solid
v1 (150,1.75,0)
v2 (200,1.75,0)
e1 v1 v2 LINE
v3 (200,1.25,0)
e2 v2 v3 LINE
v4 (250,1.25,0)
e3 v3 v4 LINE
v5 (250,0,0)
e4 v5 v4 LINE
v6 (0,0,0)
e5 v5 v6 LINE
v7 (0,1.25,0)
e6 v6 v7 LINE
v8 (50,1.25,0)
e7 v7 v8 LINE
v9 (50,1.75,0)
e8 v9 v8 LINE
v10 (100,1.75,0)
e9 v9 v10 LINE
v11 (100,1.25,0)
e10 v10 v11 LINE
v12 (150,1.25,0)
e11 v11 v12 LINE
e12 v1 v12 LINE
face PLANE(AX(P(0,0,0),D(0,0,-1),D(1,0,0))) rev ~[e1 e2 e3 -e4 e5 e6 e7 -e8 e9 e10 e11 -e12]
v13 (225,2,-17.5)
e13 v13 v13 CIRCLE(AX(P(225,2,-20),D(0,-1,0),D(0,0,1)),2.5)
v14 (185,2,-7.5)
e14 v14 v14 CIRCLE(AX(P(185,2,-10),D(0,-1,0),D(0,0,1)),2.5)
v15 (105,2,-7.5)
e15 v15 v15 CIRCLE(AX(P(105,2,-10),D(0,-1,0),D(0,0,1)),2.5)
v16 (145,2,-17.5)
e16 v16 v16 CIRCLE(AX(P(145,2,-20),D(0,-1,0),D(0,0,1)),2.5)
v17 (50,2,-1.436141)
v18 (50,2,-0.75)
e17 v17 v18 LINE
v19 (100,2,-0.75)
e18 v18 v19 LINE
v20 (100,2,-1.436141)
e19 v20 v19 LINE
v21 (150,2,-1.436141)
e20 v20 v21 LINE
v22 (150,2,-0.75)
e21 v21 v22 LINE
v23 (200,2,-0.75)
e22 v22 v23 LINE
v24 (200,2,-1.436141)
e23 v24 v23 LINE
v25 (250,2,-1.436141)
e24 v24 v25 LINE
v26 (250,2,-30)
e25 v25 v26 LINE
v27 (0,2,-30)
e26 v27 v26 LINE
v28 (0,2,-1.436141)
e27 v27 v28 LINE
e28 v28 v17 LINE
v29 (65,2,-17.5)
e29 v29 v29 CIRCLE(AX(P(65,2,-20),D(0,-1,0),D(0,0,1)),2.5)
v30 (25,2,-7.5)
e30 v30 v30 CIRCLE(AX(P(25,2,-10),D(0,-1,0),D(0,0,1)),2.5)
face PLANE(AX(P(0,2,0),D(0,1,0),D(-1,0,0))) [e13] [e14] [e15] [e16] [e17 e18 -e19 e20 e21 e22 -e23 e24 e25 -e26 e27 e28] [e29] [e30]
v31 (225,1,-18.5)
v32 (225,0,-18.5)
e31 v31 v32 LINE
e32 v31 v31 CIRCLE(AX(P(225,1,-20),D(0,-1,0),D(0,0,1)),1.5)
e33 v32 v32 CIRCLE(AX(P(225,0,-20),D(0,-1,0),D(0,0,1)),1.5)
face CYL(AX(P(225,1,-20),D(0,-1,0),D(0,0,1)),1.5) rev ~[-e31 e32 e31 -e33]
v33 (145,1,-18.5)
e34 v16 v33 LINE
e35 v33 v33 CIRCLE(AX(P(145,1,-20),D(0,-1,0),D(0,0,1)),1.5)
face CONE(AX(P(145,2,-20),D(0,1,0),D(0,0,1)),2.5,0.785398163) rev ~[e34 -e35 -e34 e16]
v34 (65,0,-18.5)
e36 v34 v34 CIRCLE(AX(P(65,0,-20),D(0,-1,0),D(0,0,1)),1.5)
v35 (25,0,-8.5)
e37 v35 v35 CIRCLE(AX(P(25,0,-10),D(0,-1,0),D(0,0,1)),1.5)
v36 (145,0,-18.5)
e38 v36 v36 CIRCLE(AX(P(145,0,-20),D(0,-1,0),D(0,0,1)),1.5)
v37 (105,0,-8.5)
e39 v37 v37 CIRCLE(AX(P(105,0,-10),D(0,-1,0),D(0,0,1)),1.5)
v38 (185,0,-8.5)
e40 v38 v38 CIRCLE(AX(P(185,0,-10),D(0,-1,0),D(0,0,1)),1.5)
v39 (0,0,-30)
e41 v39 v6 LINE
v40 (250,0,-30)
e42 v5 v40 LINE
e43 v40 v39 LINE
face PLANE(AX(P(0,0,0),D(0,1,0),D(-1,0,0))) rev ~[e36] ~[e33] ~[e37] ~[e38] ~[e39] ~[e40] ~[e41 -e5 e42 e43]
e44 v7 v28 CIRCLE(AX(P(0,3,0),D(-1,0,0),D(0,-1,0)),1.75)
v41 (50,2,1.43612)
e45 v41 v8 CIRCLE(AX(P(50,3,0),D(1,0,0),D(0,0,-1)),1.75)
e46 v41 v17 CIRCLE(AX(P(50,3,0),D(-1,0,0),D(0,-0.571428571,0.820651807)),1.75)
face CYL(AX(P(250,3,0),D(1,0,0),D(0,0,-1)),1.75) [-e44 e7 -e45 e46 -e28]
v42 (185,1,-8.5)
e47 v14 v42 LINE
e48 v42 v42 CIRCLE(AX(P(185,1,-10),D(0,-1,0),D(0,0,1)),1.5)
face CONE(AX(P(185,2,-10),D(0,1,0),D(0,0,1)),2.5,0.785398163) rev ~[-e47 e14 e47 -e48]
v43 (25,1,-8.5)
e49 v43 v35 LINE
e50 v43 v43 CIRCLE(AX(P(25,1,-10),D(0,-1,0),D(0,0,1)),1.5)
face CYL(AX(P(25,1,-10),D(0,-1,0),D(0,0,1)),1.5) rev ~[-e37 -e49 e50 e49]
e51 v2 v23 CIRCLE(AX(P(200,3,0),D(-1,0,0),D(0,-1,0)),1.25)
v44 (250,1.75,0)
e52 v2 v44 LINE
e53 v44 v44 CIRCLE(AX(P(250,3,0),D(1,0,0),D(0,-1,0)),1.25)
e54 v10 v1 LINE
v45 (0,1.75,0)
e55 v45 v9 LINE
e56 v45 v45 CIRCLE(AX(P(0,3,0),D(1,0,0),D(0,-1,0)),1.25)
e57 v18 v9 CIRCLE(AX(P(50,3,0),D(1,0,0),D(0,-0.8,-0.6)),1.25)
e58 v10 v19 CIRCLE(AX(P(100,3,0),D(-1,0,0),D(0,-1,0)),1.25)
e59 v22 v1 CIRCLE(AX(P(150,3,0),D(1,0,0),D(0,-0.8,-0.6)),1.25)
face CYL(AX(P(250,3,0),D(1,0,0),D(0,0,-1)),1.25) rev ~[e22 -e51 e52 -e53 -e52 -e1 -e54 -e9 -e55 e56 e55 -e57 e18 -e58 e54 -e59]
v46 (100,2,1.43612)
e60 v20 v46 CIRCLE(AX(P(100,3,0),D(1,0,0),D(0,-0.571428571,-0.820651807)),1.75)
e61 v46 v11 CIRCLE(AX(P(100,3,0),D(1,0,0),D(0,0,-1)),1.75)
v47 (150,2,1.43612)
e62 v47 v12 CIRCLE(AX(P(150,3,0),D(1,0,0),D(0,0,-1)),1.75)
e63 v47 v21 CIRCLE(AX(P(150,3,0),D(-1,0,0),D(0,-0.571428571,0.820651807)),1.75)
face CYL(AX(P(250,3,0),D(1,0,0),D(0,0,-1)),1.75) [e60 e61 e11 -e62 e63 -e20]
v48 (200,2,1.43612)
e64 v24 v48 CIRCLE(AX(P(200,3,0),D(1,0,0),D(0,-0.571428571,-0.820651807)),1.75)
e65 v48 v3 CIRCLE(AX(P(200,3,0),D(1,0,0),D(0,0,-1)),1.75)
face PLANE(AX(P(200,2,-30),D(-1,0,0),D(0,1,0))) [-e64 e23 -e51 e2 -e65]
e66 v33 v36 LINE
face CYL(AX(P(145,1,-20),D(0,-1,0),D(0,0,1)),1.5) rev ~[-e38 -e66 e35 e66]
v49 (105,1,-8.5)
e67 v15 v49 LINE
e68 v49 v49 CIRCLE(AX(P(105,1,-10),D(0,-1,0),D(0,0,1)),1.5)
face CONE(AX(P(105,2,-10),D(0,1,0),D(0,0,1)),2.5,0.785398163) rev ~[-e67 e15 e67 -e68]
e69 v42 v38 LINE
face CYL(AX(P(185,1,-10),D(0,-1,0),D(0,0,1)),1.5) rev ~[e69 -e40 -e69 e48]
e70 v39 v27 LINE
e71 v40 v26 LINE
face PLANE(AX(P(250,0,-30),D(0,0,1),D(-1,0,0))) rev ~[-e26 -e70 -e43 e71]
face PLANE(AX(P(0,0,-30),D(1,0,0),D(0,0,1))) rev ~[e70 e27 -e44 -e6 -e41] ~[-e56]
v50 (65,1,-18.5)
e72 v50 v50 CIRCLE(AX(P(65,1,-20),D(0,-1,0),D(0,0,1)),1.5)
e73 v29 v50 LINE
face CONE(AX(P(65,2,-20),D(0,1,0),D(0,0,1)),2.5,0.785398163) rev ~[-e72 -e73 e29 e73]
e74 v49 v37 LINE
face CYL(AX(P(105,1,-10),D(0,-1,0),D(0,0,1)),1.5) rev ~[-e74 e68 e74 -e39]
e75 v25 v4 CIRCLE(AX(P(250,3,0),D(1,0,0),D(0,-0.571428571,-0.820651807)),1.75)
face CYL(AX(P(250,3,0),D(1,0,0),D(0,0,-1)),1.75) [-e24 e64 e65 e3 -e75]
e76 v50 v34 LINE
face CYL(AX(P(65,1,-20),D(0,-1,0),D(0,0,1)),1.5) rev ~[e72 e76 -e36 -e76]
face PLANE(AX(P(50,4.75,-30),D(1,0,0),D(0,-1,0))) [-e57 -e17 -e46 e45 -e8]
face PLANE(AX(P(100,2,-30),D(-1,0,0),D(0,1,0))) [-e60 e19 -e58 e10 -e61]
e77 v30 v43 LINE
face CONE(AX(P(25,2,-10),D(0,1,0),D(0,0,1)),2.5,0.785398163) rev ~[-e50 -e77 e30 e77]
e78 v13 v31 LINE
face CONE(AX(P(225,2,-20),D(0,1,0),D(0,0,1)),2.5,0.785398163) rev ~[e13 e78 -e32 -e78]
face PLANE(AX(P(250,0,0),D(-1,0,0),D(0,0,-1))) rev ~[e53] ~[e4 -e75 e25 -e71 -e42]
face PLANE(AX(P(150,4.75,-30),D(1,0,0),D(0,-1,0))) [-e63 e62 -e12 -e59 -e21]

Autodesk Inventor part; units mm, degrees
ref_plane "YZ Plane" through (0, 0, 0) normal (1, 0, 0) x (0, 1, 0)
ref_plane "XZ Plane" through (0, 0, 0) normal (0, 1, 0) x (-1, 0, 0)
sketch "Sketch1" plane through (0, 0, 0) normal (0, 1, 0) x (-1, 0, 0)
  line L0 (0, 0) -> (-250, 0)
  line L1 (-250, 0) -> (-250, -30)
  line L2 (-250, -30) -> (0, -30)
  line L3 (0, -30) -> (0, 0)
  dimension "d0" = 250
  dimension "d1" = 30
extrude "Extrusion1" add sketch "Sketch1" along normal blind 2
sketch "Sketch2" plane through (250, 0, 0) normal (1, 0, 0) x (0, 0, -1)
  circle A0 centre (0, 3) radius 1.25
  circle A1 centre (0, 3) radius 1.75
  point P0 (0, 0)
  dimension "d4" = 2.5
  dimension "d5" = 3
  dimension "d6" = 3.5
extrude "Extrusion2" add sketch "Sketch2" against normal blind 250
extrude "Extrusion3" cut sketch "Sketch2" against normal blind 250 contours A0
sketch "Sketch3" plane through (250, 0, -30) normal (0, 0, -1) x (-1, 0, 0)
  line L0 (50, 4.75) -> (100, 4.75)
  line L1 (100, 4.75) -> (100, 2)
  line L2 (100, 2) -> (50, 2)
  line L3 (50, 2) -> (50, 4.75)
  line L4 (150, 4.75) -> (200, 4.75)
  line L5 (200, 4.75) -> (200, 2)
  line L6 (200, 2) -> (150, 2)
  line L7 (150, 2) -> (150, 4.75)
  point P0 (0, 2)
  point P1 (75, 2)
  point P2 (175, 2)
  point P3 (250, 2)
  dimension "d38" = 50
  dimension "d39" = 2.75
  dimension "d40" = 50
  dimension "d41" = 2.75
  dimension "d42" = 50
  dimension "d43" = 50
ref_plane "Work Plane1" through (200, 2, 1.4361) normal (0, 1, 0) x (1, 0, 0)
sketch "Sketch5" plane through (0, 2, 0) normal (0, 1, 0) x (1, 0, 0)
  line L0 (100, 1.75) -> (100, -1.75) projected
  line L1 (0, 0) -> (50, 0) projected
  point P0 (25, 10)
  point P1 (65, 20)
  point P2 (105, 10)
  point P3 (145, 20)
  point P4 (185, 10)
  point P5 (225, 20)
  point P6 (100, 0)
  point P7 (100, 1.4361)
  dimension "d23" = 40
  dimension "d24" = 5
  dimension "d25" = 40
  dimension "d26" = 40
  dimension "d27" = 40
  dimension "d28" = 40
  dimension "d29" = 10
  dimension "d30" = 10
hole "Hole1" at (25, 2, -10) at (65, 2, -20) at (105, 2, -10) at (145, 2, -20) at (185, 2, -10) at (225, 2, -20) direction (0, -1, 0) diameter 3 end through all countersink diameter 5 countersink angle 90
extrude "Extrusion6" cut sketch "Sketch3" against normal through all
sketch "Sketch6" plane through (150, 2, 1.4361) normal (0, 1, 0) x (1, 0, 0)
  line L0 (-50, 0) -> (-100, 0) projected
  line L1 (-50, 2.6861) -> (-50, 0.1861) projected
  line L2 (-100, 0) -> (-50, 0)
  line L3 (-50, 0) -> (-50, 1.4361)
  line L4 (-50, 1.4361) -> (-100, 1.4361)
  line L5 (-100, 1.4361) -> (-100, 0)
  line L6 (0, 0.6861) -> (0, 0) projected
  line L7 (50, 2.6861) -> (50, 0.1861) projected
  line L8 (0, 0) -> (50, 0)
  line L9 (50, 0) -> (50, 1.4361)
  line L10 (50, 1.4361) -> (0, 1.4361)
  line L11 (0, 1.4361) -> (0, 0)
  point P0 (-150, 1.4361)
  point P1 (-50, 0.6861)
  point P2 (-50, 2.1861)
  point P3 (50, 0.6861)
  point P4 (50, 2.1861)
extrude "Extrusion7" cut sketch "Sketch6" against normal through all
equation "\"d40\" = d38"
equation "\"d42\" = d38"
equation "\"d43\" = d38"
equation "\"d25\" = d23"
equation "\"d26\" = d23"
equation "\"d27\" = d23"
equation "\"d28\" = d23"
properties part number "Hinge 2 of 2" material "Steel"
